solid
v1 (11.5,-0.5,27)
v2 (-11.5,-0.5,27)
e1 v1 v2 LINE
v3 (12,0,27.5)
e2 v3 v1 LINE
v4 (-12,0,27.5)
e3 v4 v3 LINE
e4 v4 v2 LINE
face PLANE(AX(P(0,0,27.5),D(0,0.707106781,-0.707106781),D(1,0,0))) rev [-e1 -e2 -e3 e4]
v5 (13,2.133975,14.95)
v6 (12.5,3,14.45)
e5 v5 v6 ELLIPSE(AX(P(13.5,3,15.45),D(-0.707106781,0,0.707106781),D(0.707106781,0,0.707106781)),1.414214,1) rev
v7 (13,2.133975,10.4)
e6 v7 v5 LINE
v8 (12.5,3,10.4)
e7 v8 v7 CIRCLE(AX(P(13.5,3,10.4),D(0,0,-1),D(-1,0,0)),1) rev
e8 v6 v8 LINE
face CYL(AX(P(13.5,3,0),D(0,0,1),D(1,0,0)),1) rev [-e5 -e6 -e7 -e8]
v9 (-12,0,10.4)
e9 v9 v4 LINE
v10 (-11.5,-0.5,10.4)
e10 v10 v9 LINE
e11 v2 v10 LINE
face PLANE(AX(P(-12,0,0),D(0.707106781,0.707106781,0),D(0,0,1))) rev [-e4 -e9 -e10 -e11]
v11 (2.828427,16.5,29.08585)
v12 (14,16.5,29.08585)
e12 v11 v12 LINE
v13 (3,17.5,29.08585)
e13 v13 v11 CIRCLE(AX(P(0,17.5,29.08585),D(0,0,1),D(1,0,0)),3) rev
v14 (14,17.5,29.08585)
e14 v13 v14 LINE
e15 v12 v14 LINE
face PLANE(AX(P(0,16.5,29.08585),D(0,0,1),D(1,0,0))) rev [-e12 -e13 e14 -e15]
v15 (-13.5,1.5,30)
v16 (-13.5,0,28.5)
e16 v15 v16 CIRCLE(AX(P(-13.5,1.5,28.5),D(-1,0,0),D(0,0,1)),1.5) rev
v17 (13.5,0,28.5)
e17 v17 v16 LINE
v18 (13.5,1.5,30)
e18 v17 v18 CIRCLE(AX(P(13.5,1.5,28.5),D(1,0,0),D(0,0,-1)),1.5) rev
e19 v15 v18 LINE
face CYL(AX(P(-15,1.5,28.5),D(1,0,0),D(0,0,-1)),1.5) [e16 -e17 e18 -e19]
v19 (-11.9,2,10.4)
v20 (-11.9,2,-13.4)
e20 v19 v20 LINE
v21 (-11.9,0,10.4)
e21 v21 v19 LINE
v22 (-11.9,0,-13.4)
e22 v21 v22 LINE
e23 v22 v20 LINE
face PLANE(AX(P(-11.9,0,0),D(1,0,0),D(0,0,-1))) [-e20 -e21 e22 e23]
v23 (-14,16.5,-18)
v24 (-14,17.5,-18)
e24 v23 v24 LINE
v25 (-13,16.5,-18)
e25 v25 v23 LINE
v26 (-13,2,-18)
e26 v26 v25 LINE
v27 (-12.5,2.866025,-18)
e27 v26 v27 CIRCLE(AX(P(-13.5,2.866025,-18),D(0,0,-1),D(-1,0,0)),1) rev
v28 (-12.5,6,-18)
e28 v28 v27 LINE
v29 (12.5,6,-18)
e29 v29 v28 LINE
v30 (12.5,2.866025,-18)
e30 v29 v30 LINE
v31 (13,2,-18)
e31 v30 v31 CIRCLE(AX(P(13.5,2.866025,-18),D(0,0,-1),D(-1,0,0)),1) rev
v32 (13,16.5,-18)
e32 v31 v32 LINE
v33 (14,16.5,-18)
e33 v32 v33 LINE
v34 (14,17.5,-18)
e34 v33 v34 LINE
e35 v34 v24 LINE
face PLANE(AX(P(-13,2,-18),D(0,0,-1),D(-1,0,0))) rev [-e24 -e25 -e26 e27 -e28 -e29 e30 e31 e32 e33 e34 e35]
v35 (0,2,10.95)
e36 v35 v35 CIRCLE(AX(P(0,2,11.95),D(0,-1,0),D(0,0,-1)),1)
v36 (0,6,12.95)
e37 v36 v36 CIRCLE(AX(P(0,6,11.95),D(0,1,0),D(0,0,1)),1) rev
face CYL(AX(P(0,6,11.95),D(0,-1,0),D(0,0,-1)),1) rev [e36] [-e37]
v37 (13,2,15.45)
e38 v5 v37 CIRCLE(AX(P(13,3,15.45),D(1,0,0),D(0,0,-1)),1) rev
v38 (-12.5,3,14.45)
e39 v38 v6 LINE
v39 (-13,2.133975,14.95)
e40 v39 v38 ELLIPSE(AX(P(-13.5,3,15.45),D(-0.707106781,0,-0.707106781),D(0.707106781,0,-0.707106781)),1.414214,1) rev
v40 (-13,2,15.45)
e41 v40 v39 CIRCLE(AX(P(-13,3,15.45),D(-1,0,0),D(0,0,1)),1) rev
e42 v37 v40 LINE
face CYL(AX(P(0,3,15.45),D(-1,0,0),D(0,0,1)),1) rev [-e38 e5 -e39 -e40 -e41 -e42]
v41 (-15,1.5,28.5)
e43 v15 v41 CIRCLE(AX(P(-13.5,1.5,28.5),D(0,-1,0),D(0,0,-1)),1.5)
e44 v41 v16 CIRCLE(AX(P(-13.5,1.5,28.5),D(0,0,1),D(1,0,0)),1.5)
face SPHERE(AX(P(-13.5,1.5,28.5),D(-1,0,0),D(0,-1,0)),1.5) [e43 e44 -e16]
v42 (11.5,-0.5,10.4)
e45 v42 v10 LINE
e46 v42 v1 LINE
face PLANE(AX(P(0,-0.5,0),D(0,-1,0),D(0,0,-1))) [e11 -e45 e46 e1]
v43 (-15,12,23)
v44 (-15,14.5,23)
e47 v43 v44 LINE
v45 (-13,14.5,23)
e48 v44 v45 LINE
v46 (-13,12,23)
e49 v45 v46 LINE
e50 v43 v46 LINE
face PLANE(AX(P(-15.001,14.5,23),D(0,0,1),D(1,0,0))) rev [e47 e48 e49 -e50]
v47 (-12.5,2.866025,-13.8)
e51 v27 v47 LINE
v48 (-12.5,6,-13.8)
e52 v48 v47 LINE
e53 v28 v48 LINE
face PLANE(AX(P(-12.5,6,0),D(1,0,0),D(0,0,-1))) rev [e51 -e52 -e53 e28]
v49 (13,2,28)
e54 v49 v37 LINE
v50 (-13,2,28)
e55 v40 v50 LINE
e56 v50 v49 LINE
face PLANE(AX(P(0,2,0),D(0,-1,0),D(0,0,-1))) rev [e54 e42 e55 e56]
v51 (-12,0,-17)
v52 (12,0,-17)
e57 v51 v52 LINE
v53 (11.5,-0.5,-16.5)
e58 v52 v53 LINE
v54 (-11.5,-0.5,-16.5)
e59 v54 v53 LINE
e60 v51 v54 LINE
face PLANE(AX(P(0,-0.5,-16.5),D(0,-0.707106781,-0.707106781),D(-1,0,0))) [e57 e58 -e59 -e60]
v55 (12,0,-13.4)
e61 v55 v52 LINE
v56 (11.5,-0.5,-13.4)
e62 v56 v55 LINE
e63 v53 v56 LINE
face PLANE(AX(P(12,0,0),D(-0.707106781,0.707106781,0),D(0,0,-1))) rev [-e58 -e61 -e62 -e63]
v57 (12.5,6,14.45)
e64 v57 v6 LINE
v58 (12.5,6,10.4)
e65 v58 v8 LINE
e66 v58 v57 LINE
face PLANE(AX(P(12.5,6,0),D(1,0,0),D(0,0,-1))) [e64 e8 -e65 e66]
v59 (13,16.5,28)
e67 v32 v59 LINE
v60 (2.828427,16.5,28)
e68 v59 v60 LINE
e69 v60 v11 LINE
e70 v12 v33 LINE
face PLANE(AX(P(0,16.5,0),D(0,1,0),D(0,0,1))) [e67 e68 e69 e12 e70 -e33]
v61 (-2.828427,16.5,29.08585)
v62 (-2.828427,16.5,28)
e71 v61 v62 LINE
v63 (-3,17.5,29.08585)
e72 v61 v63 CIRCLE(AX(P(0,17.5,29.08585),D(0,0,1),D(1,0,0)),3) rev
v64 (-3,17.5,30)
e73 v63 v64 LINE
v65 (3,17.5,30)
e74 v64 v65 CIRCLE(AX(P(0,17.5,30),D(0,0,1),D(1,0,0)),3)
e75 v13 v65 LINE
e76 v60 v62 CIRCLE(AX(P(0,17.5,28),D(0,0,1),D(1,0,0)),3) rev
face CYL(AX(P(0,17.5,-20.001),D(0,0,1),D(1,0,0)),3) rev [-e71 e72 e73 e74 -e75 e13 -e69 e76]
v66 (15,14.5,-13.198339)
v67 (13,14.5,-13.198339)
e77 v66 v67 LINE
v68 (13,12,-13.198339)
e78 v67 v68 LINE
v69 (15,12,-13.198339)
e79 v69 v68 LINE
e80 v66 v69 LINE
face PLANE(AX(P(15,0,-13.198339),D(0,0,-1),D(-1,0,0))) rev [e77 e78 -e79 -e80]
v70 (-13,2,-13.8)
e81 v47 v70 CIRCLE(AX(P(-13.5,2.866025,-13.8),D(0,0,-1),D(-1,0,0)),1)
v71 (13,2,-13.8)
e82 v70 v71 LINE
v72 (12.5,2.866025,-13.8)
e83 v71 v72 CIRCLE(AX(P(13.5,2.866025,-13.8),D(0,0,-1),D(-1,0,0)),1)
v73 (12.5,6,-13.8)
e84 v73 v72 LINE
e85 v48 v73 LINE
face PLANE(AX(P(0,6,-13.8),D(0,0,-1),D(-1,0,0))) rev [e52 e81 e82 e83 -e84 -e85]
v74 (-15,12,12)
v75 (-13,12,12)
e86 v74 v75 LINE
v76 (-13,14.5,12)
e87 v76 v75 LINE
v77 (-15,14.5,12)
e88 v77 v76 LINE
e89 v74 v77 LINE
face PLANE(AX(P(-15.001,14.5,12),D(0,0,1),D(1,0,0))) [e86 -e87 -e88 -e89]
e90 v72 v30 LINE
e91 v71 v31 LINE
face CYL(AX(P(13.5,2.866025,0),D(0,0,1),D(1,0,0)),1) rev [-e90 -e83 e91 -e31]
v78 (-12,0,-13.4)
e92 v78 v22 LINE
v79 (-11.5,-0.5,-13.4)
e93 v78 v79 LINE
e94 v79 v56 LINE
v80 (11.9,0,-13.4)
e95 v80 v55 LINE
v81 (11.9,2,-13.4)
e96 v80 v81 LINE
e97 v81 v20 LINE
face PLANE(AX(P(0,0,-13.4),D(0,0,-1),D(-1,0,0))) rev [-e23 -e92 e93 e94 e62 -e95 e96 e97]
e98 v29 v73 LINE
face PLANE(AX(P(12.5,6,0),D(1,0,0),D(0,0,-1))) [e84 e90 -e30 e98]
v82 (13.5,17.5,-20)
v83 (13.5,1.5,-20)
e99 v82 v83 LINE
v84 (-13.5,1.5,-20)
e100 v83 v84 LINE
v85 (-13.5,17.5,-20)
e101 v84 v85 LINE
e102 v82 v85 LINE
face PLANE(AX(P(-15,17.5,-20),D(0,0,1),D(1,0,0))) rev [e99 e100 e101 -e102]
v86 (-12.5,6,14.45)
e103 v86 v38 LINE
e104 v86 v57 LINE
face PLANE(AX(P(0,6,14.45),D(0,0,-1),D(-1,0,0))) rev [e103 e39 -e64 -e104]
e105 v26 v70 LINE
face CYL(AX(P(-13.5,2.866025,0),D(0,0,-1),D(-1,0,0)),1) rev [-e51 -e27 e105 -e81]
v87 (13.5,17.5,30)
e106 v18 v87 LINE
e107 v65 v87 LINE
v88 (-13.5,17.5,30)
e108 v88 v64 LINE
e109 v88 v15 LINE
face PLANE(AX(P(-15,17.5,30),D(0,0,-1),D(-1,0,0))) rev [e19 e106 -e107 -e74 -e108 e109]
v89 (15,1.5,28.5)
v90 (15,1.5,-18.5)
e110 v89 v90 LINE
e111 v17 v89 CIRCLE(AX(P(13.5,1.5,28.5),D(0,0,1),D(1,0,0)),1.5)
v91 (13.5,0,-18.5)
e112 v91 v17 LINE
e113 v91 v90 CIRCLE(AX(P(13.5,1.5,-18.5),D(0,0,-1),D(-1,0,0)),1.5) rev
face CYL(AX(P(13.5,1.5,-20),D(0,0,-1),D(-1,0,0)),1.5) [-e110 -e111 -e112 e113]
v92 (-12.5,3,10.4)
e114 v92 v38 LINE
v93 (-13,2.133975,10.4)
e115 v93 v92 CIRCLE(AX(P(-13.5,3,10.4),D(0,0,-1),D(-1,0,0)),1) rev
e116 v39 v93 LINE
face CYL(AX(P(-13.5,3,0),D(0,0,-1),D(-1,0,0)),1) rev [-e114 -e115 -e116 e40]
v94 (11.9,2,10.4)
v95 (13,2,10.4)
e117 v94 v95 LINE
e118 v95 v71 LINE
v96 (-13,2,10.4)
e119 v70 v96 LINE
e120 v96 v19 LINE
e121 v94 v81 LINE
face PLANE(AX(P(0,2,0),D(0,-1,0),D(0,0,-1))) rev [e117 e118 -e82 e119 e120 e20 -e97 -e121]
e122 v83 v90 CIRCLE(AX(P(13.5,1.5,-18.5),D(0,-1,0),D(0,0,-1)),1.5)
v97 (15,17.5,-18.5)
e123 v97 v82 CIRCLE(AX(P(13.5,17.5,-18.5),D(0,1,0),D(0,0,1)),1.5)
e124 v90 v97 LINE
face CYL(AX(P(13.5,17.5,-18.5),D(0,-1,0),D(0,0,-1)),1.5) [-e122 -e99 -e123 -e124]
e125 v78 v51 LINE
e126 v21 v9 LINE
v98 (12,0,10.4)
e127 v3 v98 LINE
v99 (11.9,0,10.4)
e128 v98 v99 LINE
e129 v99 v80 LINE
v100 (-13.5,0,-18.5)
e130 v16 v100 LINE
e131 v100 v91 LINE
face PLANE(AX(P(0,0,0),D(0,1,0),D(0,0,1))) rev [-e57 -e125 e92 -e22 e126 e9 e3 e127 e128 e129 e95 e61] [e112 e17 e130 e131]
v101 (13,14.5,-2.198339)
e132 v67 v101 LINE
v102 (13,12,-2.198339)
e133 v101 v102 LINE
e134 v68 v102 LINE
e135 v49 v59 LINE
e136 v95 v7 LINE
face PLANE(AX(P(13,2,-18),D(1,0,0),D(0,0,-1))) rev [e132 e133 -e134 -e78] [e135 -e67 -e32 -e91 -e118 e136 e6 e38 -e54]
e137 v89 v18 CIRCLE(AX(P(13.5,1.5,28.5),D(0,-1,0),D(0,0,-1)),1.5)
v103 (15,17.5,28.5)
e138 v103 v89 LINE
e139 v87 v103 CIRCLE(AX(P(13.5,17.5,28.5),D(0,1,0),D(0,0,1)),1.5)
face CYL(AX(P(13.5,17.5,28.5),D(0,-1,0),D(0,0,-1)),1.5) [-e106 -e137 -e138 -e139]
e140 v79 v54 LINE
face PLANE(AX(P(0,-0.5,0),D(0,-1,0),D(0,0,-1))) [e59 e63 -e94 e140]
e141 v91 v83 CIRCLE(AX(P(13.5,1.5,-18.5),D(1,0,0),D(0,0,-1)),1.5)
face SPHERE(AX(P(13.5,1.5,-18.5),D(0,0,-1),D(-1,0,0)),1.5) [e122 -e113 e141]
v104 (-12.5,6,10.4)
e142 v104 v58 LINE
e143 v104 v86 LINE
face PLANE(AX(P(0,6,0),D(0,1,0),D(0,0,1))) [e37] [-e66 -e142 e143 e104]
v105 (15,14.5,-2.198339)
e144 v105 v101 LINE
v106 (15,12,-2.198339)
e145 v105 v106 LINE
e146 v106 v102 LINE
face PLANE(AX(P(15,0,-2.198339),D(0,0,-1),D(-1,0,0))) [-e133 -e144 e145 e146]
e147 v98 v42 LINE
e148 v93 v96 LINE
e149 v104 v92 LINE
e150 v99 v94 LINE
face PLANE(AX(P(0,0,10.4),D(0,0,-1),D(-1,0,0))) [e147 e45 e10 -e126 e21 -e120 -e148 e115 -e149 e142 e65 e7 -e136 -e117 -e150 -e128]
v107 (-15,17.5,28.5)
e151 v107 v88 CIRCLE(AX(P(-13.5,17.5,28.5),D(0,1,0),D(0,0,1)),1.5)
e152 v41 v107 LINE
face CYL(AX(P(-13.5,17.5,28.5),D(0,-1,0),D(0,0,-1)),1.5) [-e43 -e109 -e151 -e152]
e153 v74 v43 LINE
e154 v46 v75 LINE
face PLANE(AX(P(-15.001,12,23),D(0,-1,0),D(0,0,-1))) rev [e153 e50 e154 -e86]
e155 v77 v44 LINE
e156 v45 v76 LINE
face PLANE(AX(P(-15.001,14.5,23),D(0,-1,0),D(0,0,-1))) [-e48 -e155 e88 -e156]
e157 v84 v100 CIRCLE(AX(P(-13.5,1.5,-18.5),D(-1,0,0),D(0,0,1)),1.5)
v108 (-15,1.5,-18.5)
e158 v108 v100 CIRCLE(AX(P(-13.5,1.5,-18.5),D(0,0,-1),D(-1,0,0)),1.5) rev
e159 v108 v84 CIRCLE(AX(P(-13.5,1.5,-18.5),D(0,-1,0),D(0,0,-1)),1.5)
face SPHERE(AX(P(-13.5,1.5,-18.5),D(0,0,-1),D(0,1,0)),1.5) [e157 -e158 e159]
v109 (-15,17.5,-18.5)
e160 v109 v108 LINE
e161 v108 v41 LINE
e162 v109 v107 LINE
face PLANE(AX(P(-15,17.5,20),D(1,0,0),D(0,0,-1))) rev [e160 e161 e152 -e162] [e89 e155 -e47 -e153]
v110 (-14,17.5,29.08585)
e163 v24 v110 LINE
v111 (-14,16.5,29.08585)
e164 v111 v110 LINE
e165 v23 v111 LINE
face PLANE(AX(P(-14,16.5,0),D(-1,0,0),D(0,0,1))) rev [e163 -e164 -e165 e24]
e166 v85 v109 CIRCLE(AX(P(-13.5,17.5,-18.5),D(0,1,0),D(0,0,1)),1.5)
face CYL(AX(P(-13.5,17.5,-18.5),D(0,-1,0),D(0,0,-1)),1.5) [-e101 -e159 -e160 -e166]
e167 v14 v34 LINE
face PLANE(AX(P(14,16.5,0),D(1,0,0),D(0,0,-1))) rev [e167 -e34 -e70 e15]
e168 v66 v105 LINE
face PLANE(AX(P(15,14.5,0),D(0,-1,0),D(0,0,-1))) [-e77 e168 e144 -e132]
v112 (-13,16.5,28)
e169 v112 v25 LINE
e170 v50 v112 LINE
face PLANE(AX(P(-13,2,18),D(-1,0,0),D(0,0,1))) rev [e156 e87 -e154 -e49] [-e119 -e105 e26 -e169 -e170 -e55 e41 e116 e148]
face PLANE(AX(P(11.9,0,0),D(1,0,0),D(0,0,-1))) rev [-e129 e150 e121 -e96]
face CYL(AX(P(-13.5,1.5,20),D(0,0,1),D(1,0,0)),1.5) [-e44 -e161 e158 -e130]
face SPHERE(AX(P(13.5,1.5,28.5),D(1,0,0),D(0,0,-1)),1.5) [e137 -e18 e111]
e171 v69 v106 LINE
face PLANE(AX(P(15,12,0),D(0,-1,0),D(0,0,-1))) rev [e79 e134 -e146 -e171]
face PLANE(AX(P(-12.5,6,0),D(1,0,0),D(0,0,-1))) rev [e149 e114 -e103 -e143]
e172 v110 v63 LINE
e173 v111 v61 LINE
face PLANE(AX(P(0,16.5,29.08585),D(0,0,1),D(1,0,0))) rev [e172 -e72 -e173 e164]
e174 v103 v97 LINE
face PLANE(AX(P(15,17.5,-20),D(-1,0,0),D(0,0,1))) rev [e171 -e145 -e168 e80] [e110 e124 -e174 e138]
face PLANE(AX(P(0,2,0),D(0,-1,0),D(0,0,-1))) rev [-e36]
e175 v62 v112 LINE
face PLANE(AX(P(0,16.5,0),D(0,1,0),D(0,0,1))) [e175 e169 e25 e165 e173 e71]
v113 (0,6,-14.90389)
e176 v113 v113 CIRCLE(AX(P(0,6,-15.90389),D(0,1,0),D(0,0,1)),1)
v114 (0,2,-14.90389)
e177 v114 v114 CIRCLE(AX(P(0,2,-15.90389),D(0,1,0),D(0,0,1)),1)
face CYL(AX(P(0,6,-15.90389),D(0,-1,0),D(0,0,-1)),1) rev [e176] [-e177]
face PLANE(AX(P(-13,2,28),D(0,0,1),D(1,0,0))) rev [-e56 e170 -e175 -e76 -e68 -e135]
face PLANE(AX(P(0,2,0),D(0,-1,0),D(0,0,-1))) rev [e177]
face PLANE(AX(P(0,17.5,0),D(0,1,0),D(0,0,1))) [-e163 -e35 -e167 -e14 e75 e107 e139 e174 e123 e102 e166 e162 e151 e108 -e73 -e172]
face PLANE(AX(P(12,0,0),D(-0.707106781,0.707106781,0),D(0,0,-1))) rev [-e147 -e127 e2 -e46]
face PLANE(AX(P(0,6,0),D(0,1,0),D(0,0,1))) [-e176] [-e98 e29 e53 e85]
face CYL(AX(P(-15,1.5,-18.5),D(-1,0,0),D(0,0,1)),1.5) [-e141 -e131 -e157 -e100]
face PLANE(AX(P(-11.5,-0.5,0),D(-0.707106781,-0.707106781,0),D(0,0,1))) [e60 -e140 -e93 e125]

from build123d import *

# Parameters (mm, degrees)
BOSS_EXTRUDE1_DEPTH = 17.5
CUT_EXTRUDE1_DEPTH  = 15.5
SKETCH7_W           = 23.8
SKETCH7_H           = 23.8
CUT_EXTRUDE4_DEPTH  = 37.949289574
SKETCH7_5_W         = 25
SKETCH7_5_H         = 4.2
SKETCH7_5_R         = 1
BOSS_EXTRUDE3_DEPTH = 4
FILLET2_R           = 1.5
CUT_EXTRUDE6_REACH  = 46.612
SKETCH14_W          = 11
SKETCH14_H          = 2.5
SKETCH20_W          = 11
SKETCH20_H          = 2.5
CUT_EXTRUDE7_DEPTH  = 45.612218057
SKETCH21_W          = 24
SKETCH21_H          = 17.1
SKETCH21_H_2        = 3.6
BOSS_EXTRUDE4_DEPTH = 0.5
CHAMFER2_SIZE       = 0.5
CUT_EXTRUDE8_DEPTH  = 1
CUT_EXTRUDE9_REACH  = 57.057
FILLET3_R           = 1


# Some blends are built 0.0001 mm under size
with BuildPart() as part:
    # Sketch1 → Boss-Extrude1 (new body)
    with BuildSketch(Plane(origin=(0, 0, 0), x_dir=(1, 0, 0), z_dir=(0, 1, 0))):
        Polygon((-15, 20), (15, 20), (15, -20), (15, -30), (-15, -30), (-15, -20), align=None)
    extrude(amount=BOSS_EXTRUDE1_DEPTH)

    # Sketch2 → Cut-Extrude1 (cut)
    with BuildSketch(Plane(origin=(0, 17.5, 0), x_dir=(1, 0, 0), z_dir=(0, 1, 0))):
        Polygon((-13, 18), (13, 18), (13, -18), (13, -28), (-13, -28), (-13, -18), align=None)
    extrude(amount=-CUT_EXTRUDE1_DEPTH, mode=Mode.SUBTRACT)

    # Sketch7 → Cut-Extrude4 (cut, through all)
    with BuildSketch(Plane(origin=(0, 2, 0), x_dir=(1, 0, 0), z_dir=(0, 1, 0))):
        with Locations((0, 1.5)):
            Rectangle(SKETCH7_W, SKETCH7_H)
    extrude(amount=-CUT_EXTRUDE4_DEPTH, mode=Mode.SUBTRACT)

    # Sketch7<5> → Boss-Extrude3 (add)
    # profile 1 of 2: a face of its own
    with BuildSketch(Plane(origin=(0, 2, 0), x_dir=(1, 0, 0), z_dir=(0, 1, 0))):
        with Locations((0, 15.9)):
            Rectangle(SKETCH7_5_W, SKETCH7_5_H)
        with Locations(Location((0, 15.903889524, 0), (0, 0, 270))):
            Circle(SKETCH7_5_R, mode=Mode.SUBTRACT)
    # profile 2 of 2: a face of its own
    with BuildSketch(Plane(origin=(0, 2, 0), x_dir=(1, 0, 0), z_dir=(0, 1, 0))):
        Polygon((-11.9, -10.4), (-12.5, -10.4), (-12.5, -14.45), (0, -14.45), (12.5, -14.45), (12.5, -10.4), align=None)
        with Locations(Location((0, -11.95, 0), (0, 0, 90))):
            Circle(SKETCH7_5_R, mode=Mode.SUBTRACT)
    extrude(amount=BOSS_EXTRUDE3_DEPTH)

    # Fillet2
    fillet2_edges = [part.edges().sort_by_distance(p)[0] for p in [
        (15, 8.75, 30),
        (-15, 8.75, 30),
        (-15, 8.75, -20),
        (15, 8.75, -20),
        (0, 0, 30),
        (-15, 0, 5),
        (0, 0, -20),
        (15, 0, 5),
    ]]
    fillet(fillet2_edges, radius=FILLET2_R)

    # Sketch14 → Cut-Extrude6 (cut, up to next)
    with BuildSketch(Plane(origin=(-13, 0, 0), x_dir=(0, 0, -1), z_dir=(1, 0, 0)), mode=Mode.PRIVATE) as cut_extrude6_sk1:
        with Locations((-17.5, 13.25)):
            Rectangle(SKETCH14_W, SKETCH14_H)
    cut_extrude6_tool1 = extrude(cut_extrude6_sk1.sketch, amount=-CUT_EXTRUDE6_REACH, mode=Mode.PRIVATE) & part.part
    add(cut_extrude6_tool1.solids().sort_by_distance((-13, 13.25, 17.5))[0], mode=Mode.SUBTRACT)

    # Sketch20 → Cut-Extrude7 (cut, through all)
    with BuildSketch(Plane.ZY.offset(-13)):
        with Locations((-7.698338616, 13.25)):
            Rectangle(SKETCH20_W, SKETCH20_H)
    extrude(amount=-CUT_EXTRUDE7_DEPTH, mode=Mode.SUBTRACT)

    # Sketch21 → Boss-Extrude4 (add)
    with BuildSketch(Plane.XZ):
        with Locations((0, 18.95)):
            Rectangle(SKETCH21_W, SKETCH21_H)
        with Locations((0, -15.2)):
            Rectangle(SKETCH21_W, SKETCH21_H_2)
    extrude(amount=BOSS_EXTRUDE4_DEPTH)

    # Chamfer2
    chamfer2_edges = [part.edges().sort_by_distance(p)[0] for p in [
        (12, -0.5, 18.95),
        (-12, -0.5, 18.95),
        (-12, -0.5, -15.2),
        (0, -0.5, -17),
        (12, -0.5, -15.2),
        (0, -0.5, 27.5),
    ]]
    chamfer(chamfer2_edges, length=CHAMFER2_SIZE - 0.0001)  # a hair under: the kernel refuses the full size

    # Sketch22 → Cut-Extrude8 (cut)
    with BuildSketch(Plane(origin=(0, 17.5, 0), x_dir=(1, 0, 0), z_dir=(0, 1, 0))):
        Polygon((-13, 18), (-14, 18), (-14, -19.085850071), (-14, -29.085850071), (14, -29.085850071), (14, -19.085850071), (14, 18), (13, 18), (13, -28), (-13, -28), align=None)
    extrude(amount=-CUT_EXTRUDE8_DEPTH, mode=Mode.SUBTRACT)

    # Sketch23 → Cut-Extrude9 (cut, up to next)
    with BuildSketch(Plane.XY.offset(30), mode=Mode.PRIVATE) as cut_extrude9_sk1:
        with BuildLine():
            Line((-3, 17.5), (3, 17.5))
            ThreePointArc((3, 17.5), (0, 14.5), (-3, 17.5))
        make_face()
    cut_extrude9_tool1 = extrude(cut_extrude9_sk1.sketch, amount=-CUT_EXTRUDE9_REACH, mode=Mode.PRIVATE) & part.part
    add(cut_extrude9_tool1.solids().sort_by_distance((0, 16.22676, 30))[0], mode=Mode.SUBTRACT)

    # Fillet3
    # the kernel refuses this fillet: 1 mm, written as the material it adds along each edge
    with BuildSketch(Plane(origin=(12.5, 2, -13.8), x_dir=(1, 0, 0), z_dir=(0, 0, -1))) as fillet3_piece_1_section:
        with BuildLine():
            CenterArc((1, -0.866025404), FILLET3_R, 120, 60)
            Line((0, -0.866025404), (0, 0))
            Line((0, 0), (0.5, 0))
        make_face()
    fillet3_piece_1 = extrude(amount=6.365063509, mode=Mode.PRIVATE)
    fillet3_piece_1 = split(fillet3_piece_1, bisect_by=Plane(origin=(12.5, 2, -20), z_dir=(0, 0, 1)), keep=Keep.TOP, mode=Mode.PRIVATE)
    add(fillet3_piece_1)
    with BuildSketch(Plane(origin=(-12.5, 2, -20.165063509), x_dir=(-1, 0, 0), z_dir=(0, 0, 1))) as fillet3_piece_2_section:
        with BuildLine():
            CenterArc((1, -0.866025404), FILLET3_R, 120, 60)
            Line((0, -0.866025404), (0, 0))
            Line((0, 0), (0.5, 0))
        make_face()
    fillet3_piece_2 = extrude(amount=6.365063509, mode=Mode.PRIVATE)
    fillet3_piece_2 = split(fillet3_piece_2, bisect_by=Plane(origin=(-12.5, 2, -20), z_dir=(0, 0, 1)), keep=Keep.TOP, mode=Mode.PRIVATE)
    add(fillet3_piece_2)
    with BuildSketch(Plane(origin=(-12.5, 2, 10.4), x_dir=(-1, 0, 0), z_dir=(0, 0, 1)), Plane(origin=(12.5, 2, 14.45), x_dir=(1, 0, 0), z_dir=(0, 0, -1))) as fillet3_piece_3:
        with BuildLine():
            CenterArc((FILLET3_R, -FILLET3_R), FILLET3_R, 90, 90)
            Line((0, -FILLET3_R), (0, 0))
            Line((0, 0), (FILLET3_R, 0))
        make_face()
    extrude(amount=4.05)
    with BuildSketch(Plane(origin=(-12.5, 2, 14.45), x_dir=(0, 0, 1), z_dir=(1, 0, 0))) as fillet3_piece_4:
        with BuildLine():
            CenterArc((FILLET3_R, -FILLET3_R), FILLET3_R, 90, 90)
            Line((0, -FILLET3_R), (0, 0))
            Line((0, 0), (FILLET3_R, 0))
        make_face()
    extrude(amount=25)
    with BuildSketch(Plane(origin=(-15, 2, 14.45), x_dir=(0, 0, 1), z_dir=(1, 0, 0))) as fillet3_piece_5a_section:
        with BuildLine():
            CenterArc((FILLET3_R, -FILLET3_R), FILLET3_R, 90, 90)
            Line((0, -FILLET3_R), (0, 0))
            Line((0, 0), (FILLET3_R, 0))
        make_face()
    fillet3_piece_5a = extrude(amount=27.5, mode=Mode.PRIVATE)
    fillet3_piece_5a = split(fillet3_piece_5a, bisect_by=Plane(origin=(-13, 2, 14.45), z_dir=(1, 0, 0)), keep=Keep.TOP, mode=Mode.PRIVATE)
    fillet3_piece_5a = split(fillet3_piece_5a, bisect_by=Plane(origin=(-12.5, 2, 14.45), z_dir=(-1, 0, 0)), keep=Keep.TOP, mode=Mode.PRIVATE)
    with BuildSketch(Plane(origin=(-12.5, 2, 10.4), x_dir=(-1, 0, 0), z_dir=(0, 0, 1))) as fillet3_piece_5b_section:
        with BuildLine():
            CenterArc((FILLET3_R, -FILLET3_R), FILLET3_R, 90, 90)
            Line((0, -FILLET3_R), (0, 0))
            Line((0, 0), (FILLET3_R, 0))
        make_face()
    fillet3_piece_5b = extrude(amount=6.55, mode=Mode.PRIVATE)
    fillet3_piece_5b = split(fillet3_piece_5b, bisect_by=Plane(origin=(-13, 2, 10.4), z_dir=(1, 0, 0)), keep=Keep.TOP, mode=Mode.PRIVATE)
    fillet3_piece_5b = split(fillet3_piece_5b, bisect_by=Plane(origin=(-12.5, 2, 14.45), z_dir=(0, 0, 1)), keep=Keep.TOP, mode=Mode.PRIVATE)
    fillet3_piece_5 = fillet3_piece_5a & fillet3_piece_5b
    add(fillet3_piece_5)
    with BuildSketch(Plane(origin=(12.5, 2, 16.95), x_dir=(1, 0, 0), z_dir=(0, 0, -1))) as fillet3_piece_6a_section:
        with BuildLine():
            CenterArc((FILLET3_R, -FILLET3_R), FILLET3_R, 90, 90)
            Line((0, -FILLET3_R), (0, 0))
            Line((0, 0), (FILLET3_R, 0))
        make_face()
    fillet3_piece_6a = extrude(amount=6.55, mode=Mode.PRIVATE)
    fillet3_piece_6a = split(fillet3_piece_6a, bisect_by=Plane(origin=(13, 2, 16.95), z_dir=(-1, 0, 0)), keep=Keep.TOP, mode=Mode.PRIVATE)
    fillet3_piece_6a = split(fillet3_piece_6a, bisect_by=Plane(origin=(12.5, 2, 14.45), z_dir=(0, 0, 1)), keep=Keep.TOP, mode=Mode.PRIVATE)
    with BuildSketch(Plane(origin=(-12.5, 2, 14.45), x_dir=(0, 0, 1), z_dir=(1, 0, 0))) as fillet3_piece_6b_section:
        with BuildLine():
            CenterArc((FILLET3_R, -FILLET3_R), FILLET3_R, 90, 90)
            Line((0, -FILLET3_R), (0, 0))
            Line((0, 0), (FILLET3_R, 0))
        make_face()
    fillet3_piece_6b = extrude(amount=27.5, mode=Mode.PRIVATE)
    fillet3_piece_6b = split(fillet3_piece_6b, bisect_by=Plane(origin=(13, 2, 14.45), z_dir=(-1, 0, 0)), keep=Keep.TOP, mode=Mode.PRIVATE)
    fillet3_piece_6b = split(fillet3_piece_6b, bisect_by=Plane(origin=(12.5, 2, 14.45), z_dir=(1, 0, 0)), keep=Keep.TOP, mode=Mode.PRIVATE)
    fillet3_piece_6 = fillet3_piece_6a & fillet3_piece_6b
    add(fillet3_piece_6)


solid = part.part
